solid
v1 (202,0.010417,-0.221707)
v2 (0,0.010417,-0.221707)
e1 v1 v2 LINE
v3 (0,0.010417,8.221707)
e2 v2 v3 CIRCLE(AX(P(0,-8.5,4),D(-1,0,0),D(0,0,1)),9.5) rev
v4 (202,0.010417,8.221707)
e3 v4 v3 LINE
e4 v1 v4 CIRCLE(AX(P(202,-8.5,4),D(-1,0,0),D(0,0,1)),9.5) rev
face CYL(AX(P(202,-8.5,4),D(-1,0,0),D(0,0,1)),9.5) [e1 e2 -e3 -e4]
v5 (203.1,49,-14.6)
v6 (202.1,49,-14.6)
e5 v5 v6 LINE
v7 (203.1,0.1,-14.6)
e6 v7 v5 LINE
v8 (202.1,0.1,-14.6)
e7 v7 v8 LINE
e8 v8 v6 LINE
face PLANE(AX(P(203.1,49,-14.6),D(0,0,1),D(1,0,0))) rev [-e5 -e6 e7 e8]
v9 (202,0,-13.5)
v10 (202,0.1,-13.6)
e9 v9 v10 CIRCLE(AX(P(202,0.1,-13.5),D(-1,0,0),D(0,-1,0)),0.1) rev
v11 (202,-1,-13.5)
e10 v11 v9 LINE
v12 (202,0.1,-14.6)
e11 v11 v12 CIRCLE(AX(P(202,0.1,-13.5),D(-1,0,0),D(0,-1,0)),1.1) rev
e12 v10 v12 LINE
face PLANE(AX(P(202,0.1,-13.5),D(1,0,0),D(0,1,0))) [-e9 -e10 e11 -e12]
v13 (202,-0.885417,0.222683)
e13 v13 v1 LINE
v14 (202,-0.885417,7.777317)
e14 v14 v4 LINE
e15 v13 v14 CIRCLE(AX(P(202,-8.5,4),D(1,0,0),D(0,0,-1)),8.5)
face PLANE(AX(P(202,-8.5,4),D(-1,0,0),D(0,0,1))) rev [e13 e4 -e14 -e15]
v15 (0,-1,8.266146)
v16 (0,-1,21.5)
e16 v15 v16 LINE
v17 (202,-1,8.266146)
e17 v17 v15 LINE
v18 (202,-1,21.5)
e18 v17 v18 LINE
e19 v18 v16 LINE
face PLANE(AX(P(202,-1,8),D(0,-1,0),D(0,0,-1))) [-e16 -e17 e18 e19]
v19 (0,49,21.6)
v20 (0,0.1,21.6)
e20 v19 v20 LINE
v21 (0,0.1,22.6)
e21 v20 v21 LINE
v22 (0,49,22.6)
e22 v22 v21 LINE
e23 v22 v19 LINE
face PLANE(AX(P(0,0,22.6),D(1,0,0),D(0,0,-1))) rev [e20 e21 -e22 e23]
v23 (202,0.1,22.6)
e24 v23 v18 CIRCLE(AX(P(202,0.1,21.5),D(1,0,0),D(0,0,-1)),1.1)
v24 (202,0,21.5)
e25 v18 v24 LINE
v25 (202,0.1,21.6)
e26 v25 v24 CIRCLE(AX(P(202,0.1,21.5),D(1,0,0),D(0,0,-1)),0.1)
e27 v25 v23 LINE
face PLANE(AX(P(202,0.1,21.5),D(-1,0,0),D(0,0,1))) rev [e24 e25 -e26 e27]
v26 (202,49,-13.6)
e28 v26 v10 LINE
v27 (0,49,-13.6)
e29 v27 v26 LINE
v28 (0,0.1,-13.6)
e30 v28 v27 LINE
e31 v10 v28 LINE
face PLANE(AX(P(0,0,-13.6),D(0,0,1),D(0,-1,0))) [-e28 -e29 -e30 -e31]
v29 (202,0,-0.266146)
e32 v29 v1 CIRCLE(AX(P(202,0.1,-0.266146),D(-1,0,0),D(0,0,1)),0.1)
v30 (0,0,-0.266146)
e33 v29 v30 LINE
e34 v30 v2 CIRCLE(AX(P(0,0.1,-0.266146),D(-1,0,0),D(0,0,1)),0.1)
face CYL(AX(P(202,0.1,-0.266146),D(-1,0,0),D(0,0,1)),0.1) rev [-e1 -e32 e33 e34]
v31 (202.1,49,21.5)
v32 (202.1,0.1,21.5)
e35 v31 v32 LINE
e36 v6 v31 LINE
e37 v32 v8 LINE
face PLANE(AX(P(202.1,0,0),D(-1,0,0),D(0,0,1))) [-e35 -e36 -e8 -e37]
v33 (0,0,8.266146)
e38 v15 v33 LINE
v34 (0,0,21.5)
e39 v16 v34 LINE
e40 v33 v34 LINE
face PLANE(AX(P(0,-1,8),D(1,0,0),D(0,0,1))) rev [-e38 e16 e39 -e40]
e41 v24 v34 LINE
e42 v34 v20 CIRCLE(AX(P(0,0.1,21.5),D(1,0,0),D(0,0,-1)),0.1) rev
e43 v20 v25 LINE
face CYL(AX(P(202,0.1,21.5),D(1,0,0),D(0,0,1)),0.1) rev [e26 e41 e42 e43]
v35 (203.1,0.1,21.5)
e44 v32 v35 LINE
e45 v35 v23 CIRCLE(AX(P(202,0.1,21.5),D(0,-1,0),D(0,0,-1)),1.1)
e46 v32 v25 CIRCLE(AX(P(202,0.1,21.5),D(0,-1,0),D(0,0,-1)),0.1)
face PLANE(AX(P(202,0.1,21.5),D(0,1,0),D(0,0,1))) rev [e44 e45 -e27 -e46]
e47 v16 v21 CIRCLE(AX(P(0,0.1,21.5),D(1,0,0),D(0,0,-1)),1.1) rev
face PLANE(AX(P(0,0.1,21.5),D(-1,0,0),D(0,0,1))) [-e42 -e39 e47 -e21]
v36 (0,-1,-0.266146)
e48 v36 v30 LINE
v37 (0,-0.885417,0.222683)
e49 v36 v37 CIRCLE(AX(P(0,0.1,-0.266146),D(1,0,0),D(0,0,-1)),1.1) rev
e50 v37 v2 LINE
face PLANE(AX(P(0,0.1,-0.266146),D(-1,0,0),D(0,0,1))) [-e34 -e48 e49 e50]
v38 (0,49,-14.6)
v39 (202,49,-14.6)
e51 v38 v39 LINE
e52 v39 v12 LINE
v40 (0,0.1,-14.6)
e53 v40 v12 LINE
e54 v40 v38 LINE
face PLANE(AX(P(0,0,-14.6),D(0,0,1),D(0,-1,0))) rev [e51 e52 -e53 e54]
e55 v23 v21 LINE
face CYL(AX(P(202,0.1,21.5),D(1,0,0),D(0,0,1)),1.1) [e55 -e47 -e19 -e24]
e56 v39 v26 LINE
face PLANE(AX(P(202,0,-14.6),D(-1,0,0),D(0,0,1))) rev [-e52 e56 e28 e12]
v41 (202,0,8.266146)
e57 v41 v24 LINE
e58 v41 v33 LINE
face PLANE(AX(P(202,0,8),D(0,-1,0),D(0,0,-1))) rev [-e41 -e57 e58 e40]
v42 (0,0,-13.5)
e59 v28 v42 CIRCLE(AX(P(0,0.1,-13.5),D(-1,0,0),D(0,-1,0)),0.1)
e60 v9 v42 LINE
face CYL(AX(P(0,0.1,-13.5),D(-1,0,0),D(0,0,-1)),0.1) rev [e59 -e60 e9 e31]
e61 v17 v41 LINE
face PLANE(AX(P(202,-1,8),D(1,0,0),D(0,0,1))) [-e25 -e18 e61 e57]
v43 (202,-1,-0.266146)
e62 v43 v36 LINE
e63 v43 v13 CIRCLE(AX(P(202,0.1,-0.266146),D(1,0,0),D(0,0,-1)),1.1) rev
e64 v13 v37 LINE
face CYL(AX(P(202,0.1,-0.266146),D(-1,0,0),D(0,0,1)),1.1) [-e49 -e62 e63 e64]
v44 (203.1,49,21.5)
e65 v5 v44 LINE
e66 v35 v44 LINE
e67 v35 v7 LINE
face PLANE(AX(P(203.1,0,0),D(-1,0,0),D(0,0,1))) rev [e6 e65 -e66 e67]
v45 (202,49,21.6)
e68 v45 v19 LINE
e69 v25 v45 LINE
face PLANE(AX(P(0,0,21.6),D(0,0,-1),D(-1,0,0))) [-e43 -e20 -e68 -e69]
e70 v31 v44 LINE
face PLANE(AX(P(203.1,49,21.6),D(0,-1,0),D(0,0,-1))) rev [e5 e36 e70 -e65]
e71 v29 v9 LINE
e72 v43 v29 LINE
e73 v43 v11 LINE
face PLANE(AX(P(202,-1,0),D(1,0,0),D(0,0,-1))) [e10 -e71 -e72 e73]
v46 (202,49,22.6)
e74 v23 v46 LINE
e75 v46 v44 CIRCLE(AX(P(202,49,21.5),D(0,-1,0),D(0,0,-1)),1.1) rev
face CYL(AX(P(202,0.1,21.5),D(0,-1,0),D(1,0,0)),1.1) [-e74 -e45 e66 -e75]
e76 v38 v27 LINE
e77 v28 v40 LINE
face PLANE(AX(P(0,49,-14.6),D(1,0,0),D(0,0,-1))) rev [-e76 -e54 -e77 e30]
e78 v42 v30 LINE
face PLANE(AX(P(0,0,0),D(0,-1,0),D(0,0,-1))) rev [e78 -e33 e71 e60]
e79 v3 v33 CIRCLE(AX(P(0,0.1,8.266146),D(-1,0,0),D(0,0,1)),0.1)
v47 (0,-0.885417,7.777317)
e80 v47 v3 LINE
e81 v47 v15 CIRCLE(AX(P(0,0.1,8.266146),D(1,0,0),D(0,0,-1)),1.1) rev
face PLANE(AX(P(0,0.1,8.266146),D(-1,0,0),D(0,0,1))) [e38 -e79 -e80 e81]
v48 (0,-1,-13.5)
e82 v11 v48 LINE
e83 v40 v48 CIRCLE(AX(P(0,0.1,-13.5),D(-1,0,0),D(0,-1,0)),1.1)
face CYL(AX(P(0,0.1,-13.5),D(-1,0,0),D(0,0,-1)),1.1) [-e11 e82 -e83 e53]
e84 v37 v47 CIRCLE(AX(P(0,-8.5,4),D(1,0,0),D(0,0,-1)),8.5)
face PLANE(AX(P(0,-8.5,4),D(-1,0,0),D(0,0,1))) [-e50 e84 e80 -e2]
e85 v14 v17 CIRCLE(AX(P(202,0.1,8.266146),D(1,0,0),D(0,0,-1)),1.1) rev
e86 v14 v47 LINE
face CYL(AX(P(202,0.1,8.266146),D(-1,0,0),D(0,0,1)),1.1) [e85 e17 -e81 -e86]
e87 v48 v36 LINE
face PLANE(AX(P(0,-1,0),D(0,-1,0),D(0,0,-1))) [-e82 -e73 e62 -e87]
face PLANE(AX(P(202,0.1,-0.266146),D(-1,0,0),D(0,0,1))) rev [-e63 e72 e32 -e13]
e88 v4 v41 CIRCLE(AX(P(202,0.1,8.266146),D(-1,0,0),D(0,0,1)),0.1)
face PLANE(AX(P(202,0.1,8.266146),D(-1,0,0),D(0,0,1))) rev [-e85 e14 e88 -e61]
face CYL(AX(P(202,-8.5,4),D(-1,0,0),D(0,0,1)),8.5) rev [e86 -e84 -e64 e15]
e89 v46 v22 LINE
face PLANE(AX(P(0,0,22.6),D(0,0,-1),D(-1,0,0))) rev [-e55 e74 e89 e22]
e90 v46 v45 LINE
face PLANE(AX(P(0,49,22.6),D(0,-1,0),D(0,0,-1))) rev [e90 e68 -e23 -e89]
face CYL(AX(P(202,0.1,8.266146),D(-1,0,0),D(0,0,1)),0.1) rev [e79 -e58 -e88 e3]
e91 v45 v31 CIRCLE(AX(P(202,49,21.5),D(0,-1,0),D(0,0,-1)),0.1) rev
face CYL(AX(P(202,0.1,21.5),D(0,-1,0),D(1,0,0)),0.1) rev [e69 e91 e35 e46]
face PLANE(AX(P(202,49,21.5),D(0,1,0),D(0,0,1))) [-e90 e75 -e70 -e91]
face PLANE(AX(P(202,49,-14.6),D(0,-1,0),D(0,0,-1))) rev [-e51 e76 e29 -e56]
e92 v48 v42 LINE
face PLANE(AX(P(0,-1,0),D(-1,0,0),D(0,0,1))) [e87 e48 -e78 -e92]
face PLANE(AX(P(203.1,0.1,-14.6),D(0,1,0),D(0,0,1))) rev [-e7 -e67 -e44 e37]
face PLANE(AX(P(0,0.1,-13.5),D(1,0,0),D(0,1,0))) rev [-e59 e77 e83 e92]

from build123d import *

# Parameters (mm, degrees)
SKETCH2_W             = 202
SKETCH2_H             = 13.5
BASE_FLANGE1_DEPTH    = 1
EDGE_FLANGE1_DEPTH    = 202
SWEPT_FLANGE2_DEPTH   = 202
SWEPT_FLANGE2_2_DEPTH = 202
EDGE_FLANGE2_DEPTH    = 202
EDGE_FLANGE3_DEPTH    = 48.9


# Read off the part's stored shape, not the designer's step: Swept Flange2
# Sheet-metal steps are written as plain solids
with BuildPart() as part:
    # Sketch2 → Base-Flange1 (new body)
    with BuildSketch(Plane(origin=(0, 0, 0), x_dir=(1, 0, 0), z_dir=(0, 1, 0))):
        with Locations((101, 6.75)):
            Rectangle(SKETCH2_W, SKETCH2_H)
    extrude(amount=-BASE_FLANGE1_DEPTH)

    # Edge-Flange1 section (across the edge) → Edge-Flange1 (add)
    with BuildSketch(Plane(origin=(202, 0, -13.6), x_dir=(0, 0, 1), z_dir=(-1, 0, 0))):
        with BuildLine():
            Line((-1, 0.1), (-1, 49))
            Line((-1, 49), (0, 49))
            Line((0, 49), (0, 0.1))
            ThreePointArc((0, 0.1), (0.029289322, 0.029289322), (0.1, 0))
            Line((0.1, 0), (0.1, -1))
            ThreePointArc((0.1, -1), (-0.677817459, -0.677817459), (-1, 0.1))
        make_face()
    extrude(amount=EDGE_FLANGE1_DEPTH)

    # Swept Flange2 outline → Swept Flange2 (cut)
    with BuildSketch(Plane.YZ):
        with BuildLine():
            ThreePointArc((-1, -0.266145802), (-0.991798775, -0.132073302), (-0.967317391, 0))
            Line((-0.967317391, 0), (-1, 0))
            Line((-1, 0), (-1, -0.266145802))
        make_face()
    extrude(amount=SWEPT_FLANGE2_DEPTH, mode=Mode.SUBTRACT)

    # Swept Flange2 2 outline → Swept Flange2 2 (add)
    with BuildSketch(Plane.YZ):
        with BuildLine():
            Line((0, 21.5), (-1, 21.5))
            Line((-1, 21.5), (-1, 8.266145802))
            ThreePointArc((-1, 8.266145802), (-0.970971133, 8.015106296), (-0.885416667, 7.777316595))
            ThreePointArc((-0.885416667, 7.777316595), (0, 4), (-0.885416667, 0.222683405))
            ThreePointArc((-0.885416667, 0.222683405), (-0.932388615, 0.113556382), (-0.967317391, 0))
            Line((-0.967317391, 0), (0, 0))
            Line((0, 0), (0, -0.266145802))
            ThreePointArc((0, -0.266145802), (0.002638988, -0.243324029), (0.010416667, -0.221706783))
            ThreePointArc((0.010416667, -0.221706783), (1, 4), (0.010416667, 8.221706783))
            ThreePointArc((0.010416667, 8.221706783), (0.002638988, 8.243324029), (0, 8.266145802))
            Line((0, 8.266145802), (0, 21.5))
        make_face()
    extrude(amount=SWEPT_FLANGE2_2_DEPTH)

    # Edge-Flange2 section (across the edge) → Edge-Flange2 (add)
    with BuildSketch(Plane(origin=(0, 0, 21.6), x_dir=(0, 0, -1), z_dir=(1, 0, 0))):
        with BuildLine():
            Line((-1, 0.1), (-1, 49))
            Line((-1, 49), (0, 49))
            Line((0, 49), (0, 0.1))
            ThreePointArc((0, 0.1), (0.029289322, 0.029289322), (0.1, 0))
            Line((0.1, 0), (0.1, -1))
            ThreePointArc((0.1, -1), (-0.677817459, -0.677817459), (-1, 0.1))
        make_face()
    extrude(amount=EDGE_FLANGE2_DEPTH)

    # Edge-Flange3 section (across the edge) → Edge-Flange3 (add)
    with BuildSketch(Plane(origin=(202.1, 49, 21.6), x_dir=(-1, 0, 0), z_dir=(0, -1, 0))):
        with BuildLine():
            Line((-1, 0.1), (-1, 36.2))
            Line((-1, 36.2), (0, 36.2))
            Line((0, 36.2), (0, 0.1))
            ThreePointArc((0, 0.1), (0.029289322, 0.029289322), (0.1, 0))
            Line((0.1, 0), (0.1, -1))
            ThreePointArc((0.1, -1), (-0.677817459, -0.677817459), (-1, 0.1))
        make_face()
    extrude(amount=EDGE_FLANGE3_DEPTH)


solid = part.part
